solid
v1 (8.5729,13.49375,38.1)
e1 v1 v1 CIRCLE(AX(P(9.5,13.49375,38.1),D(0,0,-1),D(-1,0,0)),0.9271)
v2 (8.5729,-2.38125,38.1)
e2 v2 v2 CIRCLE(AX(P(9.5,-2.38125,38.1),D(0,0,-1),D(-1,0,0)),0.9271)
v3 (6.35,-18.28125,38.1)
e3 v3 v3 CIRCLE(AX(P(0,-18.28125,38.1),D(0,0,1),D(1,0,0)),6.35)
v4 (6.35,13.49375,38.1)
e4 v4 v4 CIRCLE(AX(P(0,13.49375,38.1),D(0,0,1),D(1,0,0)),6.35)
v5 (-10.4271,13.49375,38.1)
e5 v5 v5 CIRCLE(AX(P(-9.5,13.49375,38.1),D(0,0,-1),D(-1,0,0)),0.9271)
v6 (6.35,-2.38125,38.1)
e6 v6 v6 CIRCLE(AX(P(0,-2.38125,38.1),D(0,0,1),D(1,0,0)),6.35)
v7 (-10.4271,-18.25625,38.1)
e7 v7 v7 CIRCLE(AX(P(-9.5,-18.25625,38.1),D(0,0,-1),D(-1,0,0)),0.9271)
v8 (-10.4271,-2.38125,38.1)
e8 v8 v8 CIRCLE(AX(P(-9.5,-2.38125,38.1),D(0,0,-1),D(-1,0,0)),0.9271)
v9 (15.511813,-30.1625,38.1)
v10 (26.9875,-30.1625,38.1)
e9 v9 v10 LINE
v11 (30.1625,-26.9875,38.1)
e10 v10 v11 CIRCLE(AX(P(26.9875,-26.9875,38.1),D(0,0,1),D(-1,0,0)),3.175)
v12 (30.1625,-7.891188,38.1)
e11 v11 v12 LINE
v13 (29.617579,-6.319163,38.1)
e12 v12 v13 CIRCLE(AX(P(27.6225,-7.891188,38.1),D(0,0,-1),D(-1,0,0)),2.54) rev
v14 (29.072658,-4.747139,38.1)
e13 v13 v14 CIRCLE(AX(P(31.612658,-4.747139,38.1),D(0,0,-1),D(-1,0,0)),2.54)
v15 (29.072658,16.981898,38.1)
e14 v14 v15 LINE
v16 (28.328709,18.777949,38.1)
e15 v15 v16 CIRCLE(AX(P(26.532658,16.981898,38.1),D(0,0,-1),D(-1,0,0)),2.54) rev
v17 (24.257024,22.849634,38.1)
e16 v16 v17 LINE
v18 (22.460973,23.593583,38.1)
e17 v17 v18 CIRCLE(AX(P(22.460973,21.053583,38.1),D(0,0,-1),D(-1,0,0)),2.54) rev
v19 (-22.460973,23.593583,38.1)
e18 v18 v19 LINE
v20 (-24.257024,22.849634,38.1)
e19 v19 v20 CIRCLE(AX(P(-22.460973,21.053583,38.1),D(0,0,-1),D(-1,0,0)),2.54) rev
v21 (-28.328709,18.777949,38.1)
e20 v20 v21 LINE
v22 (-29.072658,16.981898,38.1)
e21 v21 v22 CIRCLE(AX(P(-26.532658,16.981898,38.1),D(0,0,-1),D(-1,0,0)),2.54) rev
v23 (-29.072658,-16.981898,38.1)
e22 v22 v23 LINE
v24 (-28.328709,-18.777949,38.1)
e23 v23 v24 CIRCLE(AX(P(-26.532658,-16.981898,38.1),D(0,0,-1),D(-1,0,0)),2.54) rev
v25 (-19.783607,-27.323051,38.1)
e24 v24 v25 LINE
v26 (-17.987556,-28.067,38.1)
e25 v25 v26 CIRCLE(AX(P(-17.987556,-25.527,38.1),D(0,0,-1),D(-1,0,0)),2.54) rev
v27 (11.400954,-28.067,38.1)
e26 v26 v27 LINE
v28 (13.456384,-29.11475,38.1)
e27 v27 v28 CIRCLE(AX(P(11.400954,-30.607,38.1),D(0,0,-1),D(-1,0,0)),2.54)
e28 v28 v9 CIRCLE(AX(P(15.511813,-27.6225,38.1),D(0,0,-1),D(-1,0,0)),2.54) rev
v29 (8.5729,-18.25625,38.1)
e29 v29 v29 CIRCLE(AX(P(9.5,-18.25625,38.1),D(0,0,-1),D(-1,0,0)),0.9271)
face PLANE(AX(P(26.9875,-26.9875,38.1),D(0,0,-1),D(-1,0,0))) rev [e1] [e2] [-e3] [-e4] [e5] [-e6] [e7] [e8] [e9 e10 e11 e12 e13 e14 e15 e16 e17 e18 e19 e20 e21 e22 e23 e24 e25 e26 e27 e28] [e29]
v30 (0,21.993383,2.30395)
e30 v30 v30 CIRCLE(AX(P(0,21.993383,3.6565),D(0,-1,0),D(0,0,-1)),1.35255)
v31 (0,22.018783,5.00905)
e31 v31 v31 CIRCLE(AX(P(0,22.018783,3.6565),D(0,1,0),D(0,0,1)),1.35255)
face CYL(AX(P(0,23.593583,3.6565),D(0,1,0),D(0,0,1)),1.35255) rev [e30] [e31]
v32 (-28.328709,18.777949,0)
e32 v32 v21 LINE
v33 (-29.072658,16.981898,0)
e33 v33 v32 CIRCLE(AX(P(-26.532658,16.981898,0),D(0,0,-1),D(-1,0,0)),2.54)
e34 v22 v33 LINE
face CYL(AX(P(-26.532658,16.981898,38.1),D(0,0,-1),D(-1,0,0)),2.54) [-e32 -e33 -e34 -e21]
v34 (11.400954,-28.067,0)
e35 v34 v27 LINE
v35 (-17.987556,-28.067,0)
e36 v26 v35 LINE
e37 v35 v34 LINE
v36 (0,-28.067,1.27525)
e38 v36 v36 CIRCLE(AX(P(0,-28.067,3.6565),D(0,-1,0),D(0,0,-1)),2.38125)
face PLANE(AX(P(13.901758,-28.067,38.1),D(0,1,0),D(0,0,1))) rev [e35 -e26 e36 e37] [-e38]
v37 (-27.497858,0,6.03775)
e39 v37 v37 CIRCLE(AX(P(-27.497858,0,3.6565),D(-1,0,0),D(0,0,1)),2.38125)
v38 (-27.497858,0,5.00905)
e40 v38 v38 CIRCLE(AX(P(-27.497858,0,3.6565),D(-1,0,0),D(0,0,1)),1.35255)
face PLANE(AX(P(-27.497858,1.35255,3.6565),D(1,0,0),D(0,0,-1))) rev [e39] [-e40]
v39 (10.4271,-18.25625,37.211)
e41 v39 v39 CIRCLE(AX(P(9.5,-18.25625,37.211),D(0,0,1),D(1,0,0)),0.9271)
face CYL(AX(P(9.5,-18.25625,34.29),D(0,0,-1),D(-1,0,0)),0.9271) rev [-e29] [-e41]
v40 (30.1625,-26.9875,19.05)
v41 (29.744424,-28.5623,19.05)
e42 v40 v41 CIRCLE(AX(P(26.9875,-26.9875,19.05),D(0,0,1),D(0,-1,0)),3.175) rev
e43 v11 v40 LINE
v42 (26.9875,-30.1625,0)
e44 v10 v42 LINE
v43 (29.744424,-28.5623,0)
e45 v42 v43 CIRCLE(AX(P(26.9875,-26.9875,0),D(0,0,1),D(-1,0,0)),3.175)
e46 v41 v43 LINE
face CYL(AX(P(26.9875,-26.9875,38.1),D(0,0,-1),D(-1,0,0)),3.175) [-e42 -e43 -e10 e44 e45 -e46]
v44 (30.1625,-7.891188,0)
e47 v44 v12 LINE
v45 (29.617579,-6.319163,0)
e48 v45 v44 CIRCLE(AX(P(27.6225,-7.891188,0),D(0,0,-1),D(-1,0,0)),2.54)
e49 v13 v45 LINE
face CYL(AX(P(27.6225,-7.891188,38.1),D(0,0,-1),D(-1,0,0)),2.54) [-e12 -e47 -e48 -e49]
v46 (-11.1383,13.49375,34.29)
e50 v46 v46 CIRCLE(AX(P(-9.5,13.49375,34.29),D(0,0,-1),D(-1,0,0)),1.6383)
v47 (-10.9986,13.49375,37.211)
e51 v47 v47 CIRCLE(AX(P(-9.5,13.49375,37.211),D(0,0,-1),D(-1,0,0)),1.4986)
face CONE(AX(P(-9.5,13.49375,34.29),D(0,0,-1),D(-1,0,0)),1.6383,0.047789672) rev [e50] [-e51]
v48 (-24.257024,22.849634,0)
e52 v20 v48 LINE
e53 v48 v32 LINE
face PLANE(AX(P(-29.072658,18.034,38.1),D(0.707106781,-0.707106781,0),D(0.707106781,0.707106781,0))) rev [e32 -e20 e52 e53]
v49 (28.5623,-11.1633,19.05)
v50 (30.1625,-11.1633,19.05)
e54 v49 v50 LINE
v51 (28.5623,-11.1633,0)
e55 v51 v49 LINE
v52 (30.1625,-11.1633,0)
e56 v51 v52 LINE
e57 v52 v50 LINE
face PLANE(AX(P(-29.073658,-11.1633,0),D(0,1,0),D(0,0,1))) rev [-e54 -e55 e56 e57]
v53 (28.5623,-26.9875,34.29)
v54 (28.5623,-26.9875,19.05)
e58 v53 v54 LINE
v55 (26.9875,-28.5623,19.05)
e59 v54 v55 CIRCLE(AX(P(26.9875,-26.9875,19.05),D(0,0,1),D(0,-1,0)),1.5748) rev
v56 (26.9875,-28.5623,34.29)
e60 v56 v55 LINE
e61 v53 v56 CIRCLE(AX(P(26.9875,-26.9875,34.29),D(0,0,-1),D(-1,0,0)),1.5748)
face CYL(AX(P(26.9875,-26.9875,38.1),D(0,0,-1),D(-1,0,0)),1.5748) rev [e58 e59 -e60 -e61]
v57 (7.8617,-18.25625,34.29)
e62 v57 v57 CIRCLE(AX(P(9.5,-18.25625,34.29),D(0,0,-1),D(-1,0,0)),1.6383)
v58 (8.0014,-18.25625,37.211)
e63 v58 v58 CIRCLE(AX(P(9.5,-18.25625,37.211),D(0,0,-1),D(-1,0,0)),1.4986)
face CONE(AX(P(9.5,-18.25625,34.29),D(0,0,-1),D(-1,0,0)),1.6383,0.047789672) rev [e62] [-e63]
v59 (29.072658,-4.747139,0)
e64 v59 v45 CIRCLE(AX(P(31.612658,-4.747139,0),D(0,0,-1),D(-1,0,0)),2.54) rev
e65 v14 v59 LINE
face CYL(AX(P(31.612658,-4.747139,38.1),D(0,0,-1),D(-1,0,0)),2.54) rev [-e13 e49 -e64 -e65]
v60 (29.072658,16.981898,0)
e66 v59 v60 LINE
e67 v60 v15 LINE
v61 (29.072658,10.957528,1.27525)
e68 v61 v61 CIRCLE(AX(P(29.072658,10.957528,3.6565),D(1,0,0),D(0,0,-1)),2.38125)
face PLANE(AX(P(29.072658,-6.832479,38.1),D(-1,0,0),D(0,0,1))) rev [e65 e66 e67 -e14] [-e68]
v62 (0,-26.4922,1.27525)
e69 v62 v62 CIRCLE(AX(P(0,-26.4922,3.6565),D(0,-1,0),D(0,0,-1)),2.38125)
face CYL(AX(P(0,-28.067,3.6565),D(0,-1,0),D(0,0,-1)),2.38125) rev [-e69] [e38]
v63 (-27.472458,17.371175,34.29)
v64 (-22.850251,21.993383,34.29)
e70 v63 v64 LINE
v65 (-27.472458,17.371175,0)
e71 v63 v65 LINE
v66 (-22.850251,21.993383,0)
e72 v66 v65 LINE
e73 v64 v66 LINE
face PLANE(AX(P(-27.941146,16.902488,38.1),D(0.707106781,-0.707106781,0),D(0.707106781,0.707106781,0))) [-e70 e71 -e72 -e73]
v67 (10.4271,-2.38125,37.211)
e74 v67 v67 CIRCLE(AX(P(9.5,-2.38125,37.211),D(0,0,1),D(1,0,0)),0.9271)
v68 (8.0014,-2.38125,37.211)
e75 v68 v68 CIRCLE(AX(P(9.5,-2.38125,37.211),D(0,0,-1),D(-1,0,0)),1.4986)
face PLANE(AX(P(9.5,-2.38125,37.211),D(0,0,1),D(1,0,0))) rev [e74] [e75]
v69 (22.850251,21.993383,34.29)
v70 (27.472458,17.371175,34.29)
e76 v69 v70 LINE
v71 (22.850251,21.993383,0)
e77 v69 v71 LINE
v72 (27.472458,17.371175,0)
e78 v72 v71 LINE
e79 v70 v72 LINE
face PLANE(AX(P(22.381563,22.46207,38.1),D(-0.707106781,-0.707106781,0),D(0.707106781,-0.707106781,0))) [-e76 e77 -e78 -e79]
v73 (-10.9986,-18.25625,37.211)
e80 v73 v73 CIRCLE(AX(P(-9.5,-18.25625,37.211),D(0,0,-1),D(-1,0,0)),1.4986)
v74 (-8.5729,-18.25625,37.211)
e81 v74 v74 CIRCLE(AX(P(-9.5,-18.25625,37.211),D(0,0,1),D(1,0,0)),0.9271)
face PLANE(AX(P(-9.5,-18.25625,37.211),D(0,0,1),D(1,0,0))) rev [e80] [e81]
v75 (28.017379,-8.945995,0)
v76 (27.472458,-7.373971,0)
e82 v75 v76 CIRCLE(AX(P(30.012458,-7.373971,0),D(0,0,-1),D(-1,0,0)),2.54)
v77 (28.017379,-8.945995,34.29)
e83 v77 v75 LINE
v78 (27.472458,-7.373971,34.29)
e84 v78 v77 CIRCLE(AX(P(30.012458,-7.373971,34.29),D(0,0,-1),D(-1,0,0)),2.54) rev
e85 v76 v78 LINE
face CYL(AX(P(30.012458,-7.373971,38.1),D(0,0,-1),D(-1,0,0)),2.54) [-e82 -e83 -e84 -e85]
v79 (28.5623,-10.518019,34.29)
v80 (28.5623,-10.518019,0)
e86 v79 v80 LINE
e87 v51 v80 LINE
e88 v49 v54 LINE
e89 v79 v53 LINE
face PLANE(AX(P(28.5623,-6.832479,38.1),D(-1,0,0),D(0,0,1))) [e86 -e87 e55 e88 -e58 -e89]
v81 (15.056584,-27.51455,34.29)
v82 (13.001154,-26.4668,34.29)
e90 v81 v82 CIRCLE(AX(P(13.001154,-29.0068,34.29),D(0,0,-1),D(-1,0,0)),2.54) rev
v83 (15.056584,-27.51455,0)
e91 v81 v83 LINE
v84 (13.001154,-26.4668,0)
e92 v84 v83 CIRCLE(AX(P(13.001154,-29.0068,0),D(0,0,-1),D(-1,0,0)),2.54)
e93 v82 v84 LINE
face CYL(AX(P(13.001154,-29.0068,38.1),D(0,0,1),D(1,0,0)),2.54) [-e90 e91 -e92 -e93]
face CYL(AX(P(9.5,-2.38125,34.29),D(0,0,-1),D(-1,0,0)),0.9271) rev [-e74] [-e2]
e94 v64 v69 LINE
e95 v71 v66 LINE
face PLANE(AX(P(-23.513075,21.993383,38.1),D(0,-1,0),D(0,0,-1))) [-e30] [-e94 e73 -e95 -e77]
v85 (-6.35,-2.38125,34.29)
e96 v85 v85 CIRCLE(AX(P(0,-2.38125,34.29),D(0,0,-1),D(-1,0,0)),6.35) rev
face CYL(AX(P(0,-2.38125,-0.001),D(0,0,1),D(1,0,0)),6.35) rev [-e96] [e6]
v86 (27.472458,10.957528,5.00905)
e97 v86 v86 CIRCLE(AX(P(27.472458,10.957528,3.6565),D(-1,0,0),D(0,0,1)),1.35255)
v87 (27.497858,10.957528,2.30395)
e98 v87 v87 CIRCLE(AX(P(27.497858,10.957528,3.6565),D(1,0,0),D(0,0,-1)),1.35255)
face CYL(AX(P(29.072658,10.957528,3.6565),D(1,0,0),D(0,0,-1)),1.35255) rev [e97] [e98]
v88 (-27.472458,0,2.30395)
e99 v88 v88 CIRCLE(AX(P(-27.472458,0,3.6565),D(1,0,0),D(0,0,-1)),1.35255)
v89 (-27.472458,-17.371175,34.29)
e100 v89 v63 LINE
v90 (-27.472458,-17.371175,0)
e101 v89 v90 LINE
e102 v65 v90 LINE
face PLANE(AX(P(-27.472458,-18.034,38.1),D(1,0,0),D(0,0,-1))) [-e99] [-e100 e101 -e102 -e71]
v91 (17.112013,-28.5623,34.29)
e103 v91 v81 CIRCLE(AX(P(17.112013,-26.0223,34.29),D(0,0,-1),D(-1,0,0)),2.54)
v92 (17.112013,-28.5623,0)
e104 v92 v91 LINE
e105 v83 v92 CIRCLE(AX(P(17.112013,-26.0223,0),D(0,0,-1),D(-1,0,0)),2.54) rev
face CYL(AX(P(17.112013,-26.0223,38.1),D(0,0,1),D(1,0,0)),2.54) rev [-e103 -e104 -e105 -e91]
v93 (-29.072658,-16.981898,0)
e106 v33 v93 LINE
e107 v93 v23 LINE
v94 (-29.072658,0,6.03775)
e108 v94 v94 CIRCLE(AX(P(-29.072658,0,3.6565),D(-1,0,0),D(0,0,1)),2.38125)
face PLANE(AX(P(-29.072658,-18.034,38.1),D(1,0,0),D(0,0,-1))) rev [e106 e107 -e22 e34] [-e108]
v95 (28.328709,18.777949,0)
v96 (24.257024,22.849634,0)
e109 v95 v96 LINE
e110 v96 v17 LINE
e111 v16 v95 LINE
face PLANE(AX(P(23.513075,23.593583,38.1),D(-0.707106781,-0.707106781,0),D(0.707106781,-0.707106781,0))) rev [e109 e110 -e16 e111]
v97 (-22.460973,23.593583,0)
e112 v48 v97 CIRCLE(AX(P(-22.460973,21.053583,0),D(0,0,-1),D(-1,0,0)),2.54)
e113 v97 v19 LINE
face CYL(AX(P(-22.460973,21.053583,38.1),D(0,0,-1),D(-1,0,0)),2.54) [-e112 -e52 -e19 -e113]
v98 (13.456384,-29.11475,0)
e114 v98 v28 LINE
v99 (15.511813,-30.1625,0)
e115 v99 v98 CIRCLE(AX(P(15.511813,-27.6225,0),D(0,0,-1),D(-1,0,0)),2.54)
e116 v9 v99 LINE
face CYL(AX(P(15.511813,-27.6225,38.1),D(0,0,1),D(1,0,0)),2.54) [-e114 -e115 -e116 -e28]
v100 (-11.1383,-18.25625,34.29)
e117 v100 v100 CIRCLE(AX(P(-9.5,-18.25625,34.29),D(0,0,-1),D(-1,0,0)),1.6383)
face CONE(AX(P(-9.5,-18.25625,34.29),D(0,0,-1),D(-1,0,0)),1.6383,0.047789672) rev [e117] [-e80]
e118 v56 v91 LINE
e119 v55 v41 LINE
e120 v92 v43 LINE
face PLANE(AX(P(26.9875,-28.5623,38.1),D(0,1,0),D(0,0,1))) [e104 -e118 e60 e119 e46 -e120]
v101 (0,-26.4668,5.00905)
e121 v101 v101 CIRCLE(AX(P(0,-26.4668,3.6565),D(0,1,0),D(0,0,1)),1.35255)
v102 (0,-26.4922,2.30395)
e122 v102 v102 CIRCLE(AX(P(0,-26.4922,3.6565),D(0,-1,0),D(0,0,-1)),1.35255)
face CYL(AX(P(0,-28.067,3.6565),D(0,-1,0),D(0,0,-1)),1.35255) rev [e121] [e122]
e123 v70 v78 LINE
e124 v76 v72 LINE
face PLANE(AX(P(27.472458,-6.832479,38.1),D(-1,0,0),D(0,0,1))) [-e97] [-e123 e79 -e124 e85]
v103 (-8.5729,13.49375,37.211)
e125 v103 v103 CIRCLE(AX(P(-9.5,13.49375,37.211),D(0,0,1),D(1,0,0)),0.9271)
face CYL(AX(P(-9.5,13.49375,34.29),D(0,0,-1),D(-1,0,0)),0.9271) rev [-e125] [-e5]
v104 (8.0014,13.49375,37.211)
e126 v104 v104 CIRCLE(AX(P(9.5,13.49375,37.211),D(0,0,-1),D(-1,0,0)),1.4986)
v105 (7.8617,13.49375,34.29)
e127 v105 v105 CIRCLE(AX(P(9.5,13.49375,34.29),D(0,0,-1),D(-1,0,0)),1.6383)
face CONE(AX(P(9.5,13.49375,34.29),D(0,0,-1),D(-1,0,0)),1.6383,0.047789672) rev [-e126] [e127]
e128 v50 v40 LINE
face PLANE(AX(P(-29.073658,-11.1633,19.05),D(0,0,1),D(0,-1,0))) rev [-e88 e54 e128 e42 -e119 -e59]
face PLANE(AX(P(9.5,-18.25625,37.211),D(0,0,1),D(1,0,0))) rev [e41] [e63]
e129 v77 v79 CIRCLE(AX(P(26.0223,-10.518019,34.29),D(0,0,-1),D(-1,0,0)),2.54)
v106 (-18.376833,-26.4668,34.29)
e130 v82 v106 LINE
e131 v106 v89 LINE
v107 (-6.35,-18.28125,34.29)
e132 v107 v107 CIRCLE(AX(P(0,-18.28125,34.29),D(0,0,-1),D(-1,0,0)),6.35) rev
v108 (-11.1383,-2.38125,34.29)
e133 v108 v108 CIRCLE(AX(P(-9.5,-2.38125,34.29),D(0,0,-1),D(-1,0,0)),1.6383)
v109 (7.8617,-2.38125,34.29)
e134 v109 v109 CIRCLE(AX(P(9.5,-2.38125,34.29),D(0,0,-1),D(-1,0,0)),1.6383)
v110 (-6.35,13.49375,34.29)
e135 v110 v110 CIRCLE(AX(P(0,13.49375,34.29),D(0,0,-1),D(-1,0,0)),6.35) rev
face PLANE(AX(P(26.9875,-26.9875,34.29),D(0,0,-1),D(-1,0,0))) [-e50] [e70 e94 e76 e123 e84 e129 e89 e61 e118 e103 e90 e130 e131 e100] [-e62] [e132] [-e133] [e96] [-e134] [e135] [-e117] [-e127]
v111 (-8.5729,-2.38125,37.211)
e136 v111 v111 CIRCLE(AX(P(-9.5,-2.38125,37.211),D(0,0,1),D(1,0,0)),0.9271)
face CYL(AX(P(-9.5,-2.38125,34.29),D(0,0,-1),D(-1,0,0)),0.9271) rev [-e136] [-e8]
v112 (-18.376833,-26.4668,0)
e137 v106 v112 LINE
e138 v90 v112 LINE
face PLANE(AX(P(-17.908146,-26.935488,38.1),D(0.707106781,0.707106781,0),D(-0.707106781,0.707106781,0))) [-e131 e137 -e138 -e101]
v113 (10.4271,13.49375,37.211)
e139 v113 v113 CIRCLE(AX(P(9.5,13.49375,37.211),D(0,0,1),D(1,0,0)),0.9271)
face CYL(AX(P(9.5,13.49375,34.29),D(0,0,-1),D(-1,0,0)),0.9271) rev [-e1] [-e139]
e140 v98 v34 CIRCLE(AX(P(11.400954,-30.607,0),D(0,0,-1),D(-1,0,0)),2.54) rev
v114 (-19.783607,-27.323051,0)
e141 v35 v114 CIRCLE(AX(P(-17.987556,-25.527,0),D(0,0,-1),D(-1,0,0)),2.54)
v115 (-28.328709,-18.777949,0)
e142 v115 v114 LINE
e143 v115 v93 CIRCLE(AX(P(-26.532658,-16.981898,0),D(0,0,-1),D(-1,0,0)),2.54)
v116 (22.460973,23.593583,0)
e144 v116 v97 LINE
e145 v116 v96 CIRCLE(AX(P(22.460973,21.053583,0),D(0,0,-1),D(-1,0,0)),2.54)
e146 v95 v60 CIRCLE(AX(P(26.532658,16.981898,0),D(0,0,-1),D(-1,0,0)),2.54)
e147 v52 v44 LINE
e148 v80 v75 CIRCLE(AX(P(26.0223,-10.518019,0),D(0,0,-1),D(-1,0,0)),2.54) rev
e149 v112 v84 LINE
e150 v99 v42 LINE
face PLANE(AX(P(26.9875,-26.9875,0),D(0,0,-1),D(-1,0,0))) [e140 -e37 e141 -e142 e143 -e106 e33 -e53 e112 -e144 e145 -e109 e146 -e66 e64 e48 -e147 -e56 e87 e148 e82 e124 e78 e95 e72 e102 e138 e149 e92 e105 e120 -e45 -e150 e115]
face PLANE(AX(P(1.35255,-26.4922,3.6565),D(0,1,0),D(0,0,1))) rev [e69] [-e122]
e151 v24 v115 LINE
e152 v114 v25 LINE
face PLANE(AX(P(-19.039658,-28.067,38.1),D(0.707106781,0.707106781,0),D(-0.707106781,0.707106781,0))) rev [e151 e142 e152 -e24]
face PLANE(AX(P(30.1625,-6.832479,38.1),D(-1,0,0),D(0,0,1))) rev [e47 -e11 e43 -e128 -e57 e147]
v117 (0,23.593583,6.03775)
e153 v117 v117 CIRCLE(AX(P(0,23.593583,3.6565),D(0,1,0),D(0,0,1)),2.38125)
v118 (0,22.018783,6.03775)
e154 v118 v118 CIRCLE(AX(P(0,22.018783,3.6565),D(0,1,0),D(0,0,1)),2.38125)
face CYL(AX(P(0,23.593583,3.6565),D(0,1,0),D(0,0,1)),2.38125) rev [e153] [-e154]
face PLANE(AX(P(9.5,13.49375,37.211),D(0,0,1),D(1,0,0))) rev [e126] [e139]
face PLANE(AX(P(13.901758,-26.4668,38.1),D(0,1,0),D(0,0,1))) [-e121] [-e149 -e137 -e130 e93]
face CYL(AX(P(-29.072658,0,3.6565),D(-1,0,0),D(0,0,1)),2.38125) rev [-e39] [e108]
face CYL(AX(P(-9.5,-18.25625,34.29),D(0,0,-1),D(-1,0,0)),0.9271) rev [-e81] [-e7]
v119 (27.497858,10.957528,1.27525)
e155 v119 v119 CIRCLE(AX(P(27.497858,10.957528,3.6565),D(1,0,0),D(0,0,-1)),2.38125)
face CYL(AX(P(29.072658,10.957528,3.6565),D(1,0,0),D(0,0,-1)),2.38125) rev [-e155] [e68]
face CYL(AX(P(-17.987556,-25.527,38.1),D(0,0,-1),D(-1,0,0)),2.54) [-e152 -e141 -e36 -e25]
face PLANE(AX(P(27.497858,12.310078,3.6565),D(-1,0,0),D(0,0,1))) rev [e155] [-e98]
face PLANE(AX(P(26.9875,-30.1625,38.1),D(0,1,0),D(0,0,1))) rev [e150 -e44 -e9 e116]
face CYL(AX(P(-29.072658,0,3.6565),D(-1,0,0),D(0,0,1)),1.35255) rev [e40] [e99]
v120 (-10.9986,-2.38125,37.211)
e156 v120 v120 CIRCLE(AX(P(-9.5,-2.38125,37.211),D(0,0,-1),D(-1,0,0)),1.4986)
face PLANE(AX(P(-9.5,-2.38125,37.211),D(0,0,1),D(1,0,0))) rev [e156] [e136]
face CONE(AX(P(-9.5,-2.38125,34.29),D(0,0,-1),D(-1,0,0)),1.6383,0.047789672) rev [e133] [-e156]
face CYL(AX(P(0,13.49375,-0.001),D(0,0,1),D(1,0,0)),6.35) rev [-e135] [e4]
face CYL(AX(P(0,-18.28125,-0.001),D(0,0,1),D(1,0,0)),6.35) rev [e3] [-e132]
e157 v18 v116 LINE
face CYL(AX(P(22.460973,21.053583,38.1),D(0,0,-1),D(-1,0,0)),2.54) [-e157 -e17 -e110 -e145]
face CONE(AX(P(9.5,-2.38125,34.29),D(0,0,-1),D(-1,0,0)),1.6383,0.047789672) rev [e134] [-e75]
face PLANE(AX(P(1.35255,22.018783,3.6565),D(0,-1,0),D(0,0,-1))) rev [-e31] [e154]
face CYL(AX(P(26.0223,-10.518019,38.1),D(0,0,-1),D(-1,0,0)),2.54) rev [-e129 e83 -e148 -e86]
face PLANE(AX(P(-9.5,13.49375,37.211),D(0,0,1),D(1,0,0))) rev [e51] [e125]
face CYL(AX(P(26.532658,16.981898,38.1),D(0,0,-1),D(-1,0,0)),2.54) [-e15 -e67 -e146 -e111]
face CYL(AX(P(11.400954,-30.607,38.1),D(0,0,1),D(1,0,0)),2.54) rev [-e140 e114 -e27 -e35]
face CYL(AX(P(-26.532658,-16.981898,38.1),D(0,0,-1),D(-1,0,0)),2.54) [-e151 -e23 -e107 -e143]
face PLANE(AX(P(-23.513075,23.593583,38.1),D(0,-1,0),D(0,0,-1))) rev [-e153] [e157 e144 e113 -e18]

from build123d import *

# Parameters (mm, degrees)
BOSS_EXTRUDE1_DEPTH                             = 38.1
SHELL1_T                                        = -1.6002
BOSS_EXTRUDE2_START                             = 2.2098
BOSS_EXTRUDE2_DEPTH                             = 3.81
FILLET1_R                                       = 2.54
FILLET2_R                                       = 2.54
CUT_EXTRUDE1_REACH                              = 78.617
SKETCH4_W                                       = 19.05
SKETCH4_H                                       = 17.399
CBORE_FOR_2_PAN_HEAD_MACHINE_SCREW1_D           = 2.7051
CBORE_FOR_2_PAN_HEAD_MACHINE_SCREW1_DEPTH       = 1.6002
CBORE_FOR_2_PAN_HEAD_MACHINE_SCREW1_CBORE_D     = 4.7625
CBORE_FOR_2_PAN_HEAD_MACHINE_SCREW1_CBORE_DEPTH = 1.5748
CBORE_FOR_2_PAN_HEAD_MACHINE_SCREW2_D           = 2.7051
CBORE_FOR_2_PAN_HEAD_MACHINE_SCREW2_DEPTH       = 1.6002
CBORE_FOR_2_PAN_HEAD_MACHINE_SCREW2_CBORE_D     = 4.7625
CBORE_FOR_2_PAN_HEAD_MACHINE_SCREW2_CBORE_DEPTH = 1.5748
CBORE_FOR_2_PAN_HEAD_MACHINE_SCREW3_D           = 2.7051
CBORE_FOR_2_PAN_HEAD_MACHINE_SCREW3_DEPTH       = 1.6002
CBORE_FOR_2_PAN_HEAD_MACHINE_SCREW3_CBORE_D     = 4.7625
CBORE_FOR_2_PAN_HEAD_MACHINE_SCREW3_CBORE_DEPTH = 1.5748
CBORE_FOR_2_PAN_HEAD_MACHINE_SCREW4_D           = 2.7051
CBORE_FOR_2_PAN_HEAD_MACHINE_SCREW4_CBORE_D     = 4.7625
CBORE_FOR_2_PAN_HEAD_MACHINE_SCREW4_CBORE_DEPTH = 1.5748
HOLE1_AT_2_COUNT                                = 2
HOLE1_AT_2_PITCH                                = 19
HOLE1_AT_3_COUNT                                = 2
HOLE1_AT_3_PITCH                                = 24.759152348
HOLE1_AT_4_COUNT                                = 2
HOLE1_AT_4_PITCH                                = 15.875
HOLE1_AT_5_COUNT                                = 2
HOLE1_AT_5_PITCH                                = 31.75
HOLE1_AT_6_COUNT                                = 2
HOLE1_AT_6_PITCH                                = 37.000844585
F_0_CLEARANCE_HOLE1_D                           = 1.8542
CUT_EXTRUDE2_REACH                              = 59.194
SKETCH27_R                                      = 6.35


with BuildPart() as part:
    # Sketch1 → Boss-Extrude1 (new body)
    with BuildSketch(Plane.XY):
        with BuildLine():
            Line((-19.03965798, -28.067), (-29.07265798, -18.034))
            Line((-29.07265798, -18.034), (-29.07265798, 18.034))
            Line((-29.07265798, 18.034), (-23.513075374, 23.593582606))
            Line((-23.513075374, 23.593582606), (23.513075374, 23.593582606))
            Line((23.513075374, 23.593582606), (29.07265798, 18.034))
            Line((29.07265798, 18.034), (29.07265798, -6.832479122))
            Line((29.07265798, -6.832479122), (30.1625, -6.832479122))
            Line((30.1625, -6.832479122), (30.1625, -26.9875))
            ThreePointArc((30.1625, -26.9875), (29.23256403, -29.23256403), (26.9875, -30.1625))
            Line((26.9875, -30.1625), (13.90175798, -30.1625))
            Line((13.90175798, -30.1625), (13.90175798, -28.067))
            Line((13.90175798, -28.067), (-19.03965798, -28.067))
        make_face()
    extrude(amount=BOSS_EXTRUDE1_DEPTH)

    # Shell1
    shell1_openings = [part.faces().sort_by_distance(p)[0] for p in [
        (0.895795901, -2.511562828, 0),
    ]]
    offset(amount=SHELL1_T, openings=shell1_openings, kind=Kind.INTERSECTION)

    # Sketch14 → Boss-Extrude2 (add)
    with BuildSketch(Plane(origin=(0, 0, 36.4998), x_dir=(-1, 0, 0), z_dir=(0, 0, -1)).offset(BOSS_EXTRUDE2_START)):
        with BuildLine():
            Line((27.47245798, 17.371175457), (22.850250832, 21.993382606))
            Line((22.850250832, 21.993382606), (-22.850250832, 21.993382606))
            Line((-22.850250832, 21.993382606), (-27.47245798, 17.371175457))
            Line((-27.47245798, 17.371175457), (-27.47245798, -8.432679122))
            Line((-27.47245798, -8.432679122), (-28.5623, -8.432679122))
            Line((-28.5623, -8.432679122), (-28.5623, -26.9875))
            ThreePointArc((-28.5623, -26.9875), (-28.101051759, -28.101051759), (-26.9875, -28.5623))
            Line((-26.9875, -28.5623), (-15.50195798, -28.5623))
            Line((-15.50195798, -28.5623), (-15.50195798, -26.4668))
            Line((-15.50195798, -26.4668), (18.376833438, -26.4668))
            Line((18.376833438, -26.4668), (27.47245798, -17.371175457))
            Line((27.47245798, -17.371175457), (27.47245798, 17.371175457))
        make_face()
    extrude(amount=-BOSS_EXTRUDE2_DEPTH)

    # Fillet1
    # the kernel refuses this fillet: 2.54 mm, written as the material it adds along each edge
    with BuildSketch(Plane(origin=(13.90175798, -28.067, 0), x_dir=(0, -1, 0), z_dir=(0, 0, 1))) as fillet1_piece_1:
        with BuildLine():
            CenterArc((2.54, -2.500803821), FILLET1_R, 100.078658108, 79.921341892)
            Line((0, -2.500803821), (0, 0))
            Line((0, 0), (2.0955, 0))
        make_face()
    extrude(amount=38.1)
    with BuildSketch(Plane(origin=(28.5623, -8.432679122, 34.29), x_dir=(0, -1, 0), z_dir=(0, 0, -1))) as fillet1_piece_2:
        with BuildLine():
            CenterArc((2.08533974, 2.54), FILLET1_R, 214.814987039, 55.185012961)
            Line((0, 1.08984202), (0, 0))
            Line((0, 0), (2.08533974, 0))
        make_face()
    extrude(amount=34.29)
    with BuildSketch(Plane(origin=(29.07265798, -6.832479122, 0), x_dir=(0, 1, 0), z_dir=(0, 0, 1))) as fillet1_piece_3:
        with BuildLine():
            CenterArc((2.08533974, -2.54), FILLET1_R, 90, 55.185012961)
            Line((0, -1.08984202), (0, 0))
            Line((0, 0), (2.08533974, 0))
        make_face()
    extrude(amount=38.1)
    # the kernel refuses this fillet: 2.54 mm, written as the material it takes off along each edge
    with BuildSketch(Plane(origin=(15.50195798, -26.4668, -6.252009552), x_dir=(-1, 0, 0), z_dir=(0, 0, 1))) as fillet1_2_piece_1:
        with BuildLine():
            CenterArc((2.500803821, 2.54), FILLET1_R, 190.078658108, 79.921341892)
            Line((0, 2.0955), (0, 0))
            Line((0, 0), (2.500803821, 0))
        make_face()
    extrude(amount=40.542009552, mode=Mode.SUBTRACT)
    with BuildSketch(Plane(origin=(-29.07265798, -18.034, -2.630256121), x_dir=(0.7071067811865475, -0.7071067811865475, 0), z_dir=(0, 0, 1)), Plane(origin=(-19.03965798, -28.067, -2.630256121), x_dir=(1, 0, 0), z_dir=(0, 0, 1)), Plane(origin=(29.07265798, 18.034, -2.630256121), x_dir=(-0.7071067811865476, 0.7071067811865476, 0), z_dir=(0, 0, 1)), Plane(origin=(23.513075374, 23.593582606, -2.630256121), x_dir=(-1, 0, 0), z_dir=(0, 0, 1)), Plane(origin=(-23.513075374, 23.593582606, -2.630256121), x_dir=(-0.7071067811865476, -0.7071067811865476, 0), z_dir=(0, 0, 1)), Plane(origin=(-29.07265798, 18.034, -2.630256121), x_dir=(0, -1, 0), z_dir=(0, 0, 1))) as fillet1_2_piece_2:
        with BuildLine():
            CenterArc((FILLET1_R * 0.414213562373, FILLET1_R), FILLET1_R, 225, 45)
            Line((-FILLET1_R * 0.292893218813, FILLET1_R * 0.292893218813), (0, 0))
            Line((0, 0), (FILLET1_R * 0.414213562373, 0))
        make_face()
    extrude(amount=43.360512242, mode=Mode.SUBTRACT)

    # Fillet2
    fillet2_edges = [part.edges().sort_by_distance(p)[0] for p in [
        (30.1625, -6.832479122, 19.05),
        (13.90175798, -30.1625, 19.05),
        (27.47245798, -8.432679122, 17.145),
        (15.50195798, -28.5623, 17.145),
    ]]
    fillet(fillet2_edges, radius=FILLET2_R)

    # Sketch4 → Cut-Extrude1 (cut, up to next)
    with BuildSketch(Plane(origin=(30.1625, 0, 0), x_dir=(0, 0, -1), z_dir=(1, 0, 0)), mode=Mode.PRIVATE) as cut_extrude1_sk1:
        with Locations((-9.525, -19.8628)):
            Rectangle(SKETCH4_W, SKETCH4_H)
    cut_extrude1_tool1 = extrude(cut_extrude1_sk1.sketch, amount=-CUT_EXTRUDE1_REACH, mode=Mode.PRIVATE) & part.part
    add(cut_extrude1_tool1.solids().sort_by_distance((30.1625, -19.8628, 9.525))[0], mode=Mode.SUBTRACT)

    # CBORE for #2 Pan Head Machine Screw1
    with Locations(Plane.ZY.offset(29.07265798)):
        with Locations((3.6565, 0)):
            CounterBoreHole(CBORE_FOR_2_PAN_HEAD_MACHINE_SCREW1_D / 2, CBORE_FOR_2_PAN_HEAD_MACHINE_SCREW1_CBORE_D / 2, CBORE_FOR_2_PAN_HEAD_MACHINE_SCREW1_CBORE_DEPTH, depth=CBORE_FOR_2_PAN_HEAD_MACHINE_SCREW1_DEPTH)

    # CBORE for #2 Pan Head Machine Screw2
    with Locations(Plane(origin=(0, 23.593582606, 0), x_dir=(1, 0, 0), z_dir=(0, 1, 0))):
        with Locations((0, -3.6565)):
            CounterBoreHole(CBORE_FOR_2_PAN_HEAD_MACHINE_SCREW2_D / 2, CBORE_FOR_2_PAN_HEAD_MACHINE_SCREW2_CBORE_D / 2, CBORE_FOR_2_PAN_HEAD_MACHINE_SCREW2_CBORE_DEPTH, depth=CBORE_FOR_2_PAN_HEAD_MACHINE_SCREW2_DEPTH)

    # CBORE for #2 Pan Head Machine Screw3
    with Locations(Plane(origin=(29.07265798, 0, 0), x_dir=(0, 0, -1), z_dir=(1, 0, 0))):
        with Locations((-3.6565, 10.957528192)):
            CounterBoreHole(CBORE_FOR_2_PAN_HEAD_MACHINE_SCREW3_D / 2, CBORE_FOR_2_PAN_HEAD_MACHINE_SCREW3_CBORE_D / 2, CBORE_FOR_2_PAN_HEAD_MACHINE_SCREW3_CBORE_DEPTH, depth=CBORE_FOR_2_PAN_HEAD_MACHINE_SCREW3_DEPTH)

    # CBORE for #2 Pan Head Machine Screw4 (through all)
    with Locations(Plane(origin=(0, -28.067, 0), x_dir=(-1, 0, 0), z_dir=(0, -1, 0))):
        with Locations((0, -3.6565)):
            CounterBoreHole(CBORE_FOR_2_PAN_HEAD_MACHINE_SCREW4_D / 2, CBORE_FOR_2_PAN_HEAD_MACHINE_SCREW4_CBORE_D / 2, CBORE_FOR_2_PAN_HEAD_MACHINE_SCREW4_CBORE_DEPTH)

    # Sketch24 → Hole1 (revolve, cut)
    with BuildSketch(Plane(origin=(9.5, 13.49375, 34.29), x_dir=(0, 1, 0), z_dir=(1, 0, 0))):
        Polygon((0, 0), (0, 2.921), (1.4986, 2.921), (1.6383, 0), align=None)
    hole1 = revolve(axis=Axis((9.5, 13.49375, 144.29), (0, 0, -1)), mode=Mode.SUBTRACT)

    # Hole1 at 2: Hole1 ×2
    with Locations(*[(-i * HOLE1_AT_2_PITCH, 0, 0) for i in range(1, HOLE1_AT_2_COUNT)]):
        add(hole1, mode=Mode.SUBTRACT)

    # Hole1 at 3: Hole1 ×2
    with Locations(*[Vector(-0.7673929920061523, -0.6411770393735614, 0) * (i * HOLE1_AT_3_PITCH) for i in range(1, HOLE1_AT_3_COUNT)]):
        add(hole1, mode=Mode.SUBTRACT)

    # Hole1 at 4: Hole1 ×2
    with Locations(*[(0, -i * HOLE1_AT_4_PITCH, 0) for i in range(1, HOLE1_AT_4_COUNT)]):
        add(hole1, mode=Mode.SUBTRACT)

    # Hole1 at 5: Hole1 ×2
    with Locations(*[(0, -i * HOLE1_AT_5_PITCH, 0) for i in range(1, HOLE1_AT_5_COUNT)]):
        add(hole1, mode=Mode.SUBTRACT)

    # Hole1 at 6: Hole1 ×2
    with Locations(*[Vector(-0.5135017920030289, -0.8580885208471666, 0) * (i * HOLE1_AT_6_PITCH) for i in range(1, HOLE1_AT_6_COUNT)]):
        add(hole1, mode=Mode.SUBTRACT)

    # #0 Clearance Hole1 (through all)
    with Locations(Plane(origin=(0, 0, 34.29), x_dir=(-1, 0, 0), z_dir=(0, 0, -1))):
        with Locations((-9.5, 13.49375), (9.5, 13.49375), (-9.5, -2.38125), (9.5, -2.38125), (-9.5, -18.25625), (9.5, -18.25625)):
            Hole(F_0_CLEARANCE_HOLE1_D / 2)

    # Sketch27 → Cut-Extrude2 (cut, up to next)
    with BuildSketch(Plane.XY.offset(38.1), mode=Mode.PRIVATE) as cut_extrude2_sk1:
        with Locations((0, 13.49375)):
            Circle(SKETCH27_R)
    cut_extrude2_tool1 = extrude(cut_extrude2_sk1.sketch, amount=-CUT_EXTRUDE2_REACH, mode=Mode.PRIVATE) & part.part
    # Sketch27 → Cut-Extrude2 (cut, up to next)
    with BuildSketch(Plane.XY.offset(38.1), mode=Mode.PRIVATE) as cut_extrude2_sk2:
        with Locations((0, -2.38125)):
            Circle(SKETCH27_R)
    cut_extrude2_tool2 = extrude(cut_extrude2_sk2.sketch, amount=-CUT_EXTRUDE2_REACH, mode=Mode.PRIVATE) & part.part
    # Sketch27 → Cut-Extrude2 (cut, up to next)
    with BuildSketch(Plane.XY.offset(38.1), mode=Mode.PRIVATE) as cut_extrude2_sk3:
        with Locations((0, -18.28125)):
            Circle(SKETCH27_R)
    cut_extrude2_tool3 = extrude(cut_extrude2_sk3.sketch, amount=-CUT_EXTRUDE2_REACH, mode=Mode.PRIVATE) & part.part
    add(cut_extrude2_tool1.solids().sort_by_distance((0, 13.49375, 38.1))[0], mode=Mode.SUBTRACT)
    add(cut_extrude2_tool2.solids().sort_by_distance((0, -2.38125, 38.1))[0], mode=Mode.SUBTRACT)
    add(cut_extrude2_tool3.solids().sort_by_distance((0, -18.28125, 38.1))[0], mode=Mode.SUBTRACT)


solid = part.part
